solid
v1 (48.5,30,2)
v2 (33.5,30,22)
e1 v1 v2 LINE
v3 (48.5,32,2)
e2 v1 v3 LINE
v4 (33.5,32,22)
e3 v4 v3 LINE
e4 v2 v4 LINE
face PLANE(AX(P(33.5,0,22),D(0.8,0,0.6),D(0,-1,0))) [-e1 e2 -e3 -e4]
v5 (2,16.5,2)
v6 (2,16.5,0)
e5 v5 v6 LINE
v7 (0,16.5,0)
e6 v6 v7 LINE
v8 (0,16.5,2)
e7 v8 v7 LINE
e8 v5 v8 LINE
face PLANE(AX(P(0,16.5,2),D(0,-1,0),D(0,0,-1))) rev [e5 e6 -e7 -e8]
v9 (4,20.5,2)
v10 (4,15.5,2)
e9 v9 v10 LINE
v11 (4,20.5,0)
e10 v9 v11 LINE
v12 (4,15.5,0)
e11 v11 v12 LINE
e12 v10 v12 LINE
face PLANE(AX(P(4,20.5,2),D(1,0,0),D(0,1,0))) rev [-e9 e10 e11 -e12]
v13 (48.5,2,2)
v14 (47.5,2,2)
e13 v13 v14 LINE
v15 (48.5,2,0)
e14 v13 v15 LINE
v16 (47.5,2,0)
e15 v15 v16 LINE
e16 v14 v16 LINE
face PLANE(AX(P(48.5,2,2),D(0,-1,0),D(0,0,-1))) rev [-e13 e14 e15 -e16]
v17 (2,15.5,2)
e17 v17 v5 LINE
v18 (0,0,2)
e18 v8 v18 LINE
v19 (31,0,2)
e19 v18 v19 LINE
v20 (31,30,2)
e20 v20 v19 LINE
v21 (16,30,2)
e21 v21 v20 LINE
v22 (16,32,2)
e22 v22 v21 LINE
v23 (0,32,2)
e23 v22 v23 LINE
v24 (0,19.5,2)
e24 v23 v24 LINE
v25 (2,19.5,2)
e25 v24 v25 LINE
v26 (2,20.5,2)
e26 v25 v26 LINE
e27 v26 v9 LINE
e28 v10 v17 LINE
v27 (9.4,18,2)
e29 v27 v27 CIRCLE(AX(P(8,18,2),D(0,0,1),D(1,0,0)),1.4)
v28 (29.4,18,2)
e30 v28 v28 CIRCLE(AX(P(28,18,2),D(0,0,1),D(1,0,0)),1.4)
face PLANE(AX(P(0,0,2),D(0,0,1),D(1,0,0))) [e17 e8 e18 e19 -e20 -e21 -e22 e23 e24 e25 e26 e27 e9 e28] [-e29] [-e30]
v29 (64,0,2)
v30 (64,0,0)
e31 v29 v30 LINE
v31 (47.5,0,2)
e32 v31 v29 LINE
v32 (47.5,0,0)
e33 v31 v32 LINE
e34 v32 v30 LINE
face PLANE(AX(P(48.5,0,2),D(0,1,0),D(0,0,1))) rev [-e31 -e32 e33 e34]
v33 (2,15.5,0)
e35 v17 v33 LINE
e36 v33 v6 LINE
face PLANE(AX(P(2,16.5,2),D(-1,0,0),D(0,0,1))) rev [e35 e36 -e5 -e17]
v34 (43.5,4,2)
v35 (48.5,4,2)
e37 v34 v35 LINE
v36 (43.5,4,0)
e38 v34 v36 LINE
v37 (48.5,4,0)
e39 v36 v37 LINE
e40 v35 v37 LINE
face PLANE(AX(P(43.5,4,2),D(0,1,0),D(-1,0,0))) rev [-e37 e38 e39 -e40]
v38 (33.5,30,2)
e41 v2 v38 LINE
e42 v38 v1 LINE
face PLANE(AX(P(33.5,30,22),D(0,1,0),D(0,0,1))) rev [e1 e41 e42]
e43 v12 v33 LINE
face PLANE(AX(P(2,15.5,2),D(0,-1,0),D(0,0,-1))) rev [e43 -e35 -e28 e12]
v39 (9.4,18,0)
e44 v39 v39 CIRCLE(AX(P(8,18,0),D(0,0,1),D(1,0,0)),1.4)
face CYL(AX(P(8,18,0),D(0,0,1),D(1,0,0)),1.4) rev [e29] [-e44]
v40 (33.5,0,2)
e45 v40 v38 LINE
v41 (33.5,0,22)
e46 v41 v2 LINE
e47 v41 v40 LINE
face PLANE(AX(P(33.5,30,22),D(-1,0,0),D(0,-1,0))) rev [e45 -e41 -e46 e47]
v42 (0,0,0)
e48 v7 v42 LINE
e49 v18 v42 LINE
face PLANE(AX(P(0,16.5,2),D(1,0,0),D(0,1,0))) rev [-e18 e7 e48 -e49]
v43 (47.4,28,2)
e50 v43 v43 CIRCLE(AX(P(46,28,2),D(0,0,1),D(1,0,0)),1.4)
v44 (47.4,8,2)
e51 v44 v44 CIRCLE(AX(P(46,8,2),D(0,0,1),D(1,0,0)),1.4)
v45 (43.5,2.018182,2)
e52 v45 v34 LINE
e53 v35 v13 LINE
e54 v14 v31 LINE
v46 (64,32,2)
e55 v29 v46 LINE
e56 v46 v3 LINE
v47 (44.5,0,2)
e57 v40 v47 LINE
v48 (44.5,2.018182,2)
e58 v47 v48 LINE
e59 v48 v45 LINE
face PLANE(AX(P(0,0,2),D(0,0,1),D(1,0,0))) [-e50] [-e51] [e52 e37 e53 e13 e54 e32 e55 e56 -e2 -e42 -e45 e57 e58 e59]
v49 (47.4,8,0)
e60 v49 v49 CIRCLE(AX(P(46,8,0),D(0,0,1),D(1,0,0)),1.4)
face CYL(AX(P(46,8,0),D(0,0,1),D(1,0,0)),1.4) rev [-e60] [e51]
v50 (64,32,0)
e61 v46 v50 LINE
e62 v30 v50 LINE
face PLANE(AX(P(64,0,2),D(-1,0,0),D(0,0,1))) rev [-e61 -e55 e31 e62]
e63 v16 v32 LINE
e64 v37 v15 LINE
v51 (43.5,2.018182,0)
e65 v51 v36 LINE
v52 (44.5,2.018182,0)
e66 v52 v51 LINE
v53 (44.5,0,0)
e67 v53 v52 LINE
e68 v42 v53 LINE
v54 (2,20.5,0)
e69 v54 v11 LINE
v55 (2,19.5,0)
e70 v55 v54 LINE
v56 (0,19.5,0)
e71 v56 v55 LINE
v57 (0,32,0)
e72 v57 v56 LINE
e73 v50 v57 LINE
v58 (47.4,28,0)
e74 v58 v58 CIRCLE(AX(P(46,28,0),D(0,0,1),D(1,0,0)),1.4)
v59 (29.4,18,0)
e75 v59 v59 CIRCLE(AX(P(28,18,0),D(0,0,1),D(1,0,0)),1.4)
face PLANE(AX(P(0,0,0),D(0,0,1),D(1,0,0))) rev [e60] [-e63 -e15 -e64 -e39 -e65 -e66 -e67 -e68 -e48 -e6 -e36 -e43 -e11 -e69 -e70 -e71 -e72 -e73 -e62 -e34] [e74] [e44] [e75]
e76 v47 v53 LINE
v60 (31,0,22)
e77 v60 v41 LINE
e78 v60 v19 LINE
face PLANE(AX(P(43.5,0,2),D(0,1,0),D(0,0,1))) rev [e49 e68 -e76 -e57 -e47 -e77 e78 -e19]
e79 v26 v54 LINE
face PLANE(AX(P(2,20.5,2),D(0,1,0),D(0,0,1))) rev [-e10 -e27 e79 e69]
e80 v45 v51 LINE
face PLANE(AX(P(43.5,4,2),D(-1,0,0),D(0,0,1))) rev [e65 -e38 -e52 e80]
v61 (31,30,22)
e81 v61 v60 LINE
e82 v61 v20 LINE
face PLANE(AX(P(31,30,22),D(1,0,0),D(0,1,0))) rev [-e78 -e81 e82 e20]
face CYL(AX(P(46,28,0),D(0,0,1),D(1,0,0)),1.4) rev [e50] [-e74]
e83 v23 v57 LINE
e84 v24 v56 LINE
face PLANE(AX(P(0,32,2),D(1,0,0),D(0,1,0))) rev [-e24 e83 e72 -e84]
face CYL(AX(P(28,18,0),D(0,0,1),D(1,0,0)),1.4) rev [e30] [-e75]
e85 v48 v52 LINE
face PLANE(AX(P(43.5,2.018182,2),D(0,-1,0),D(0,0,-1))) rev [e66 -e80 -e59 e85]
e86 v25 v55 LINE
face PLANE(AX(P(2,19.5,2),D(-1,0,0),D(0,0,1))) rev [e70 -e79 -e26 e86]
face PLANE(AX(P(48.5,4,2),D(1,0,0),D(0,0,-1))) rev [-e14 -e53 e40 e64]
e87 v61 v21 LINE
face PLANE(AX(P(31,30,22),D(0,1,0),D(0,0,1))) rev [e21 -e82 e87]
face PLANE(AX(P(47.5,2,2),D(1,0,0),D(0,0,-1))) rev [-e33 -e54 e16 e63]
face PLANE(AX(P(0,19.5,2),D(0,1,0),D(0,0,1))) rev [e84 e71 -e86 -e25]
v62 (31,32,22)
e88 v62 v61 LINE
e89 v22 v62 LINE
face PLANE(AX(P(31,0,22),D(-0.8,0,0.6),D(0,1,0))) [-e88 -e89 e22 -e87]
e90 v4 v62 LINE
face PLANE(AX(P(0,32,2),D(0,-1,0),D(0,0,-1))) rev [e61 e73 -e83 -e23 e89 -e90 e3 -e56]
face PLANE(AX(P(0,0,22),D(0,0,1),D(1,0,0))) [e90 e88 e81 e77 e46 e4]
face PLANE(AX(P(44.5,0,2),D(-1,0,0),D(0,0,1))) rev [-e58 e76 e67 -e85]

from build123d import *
from OCP.BRepFilletAPI import BRepFilletAPI_MakeChamfer

# Parameters (mm, degrees)
BOSS_EXTRU_1_DEPTH      = 2
BOSS_EXTRU_2_DEPTH      = 20
ESQUISSE2_R             = 1.4
ENL_V_MAT_EXTRU_1_DEPTH = 75.296702484
CHANFREIN1_SIZE         = 15
CHANFREIN1_SIZE_2       = 20


with BuildPart() as part:
    # Esquisse1 → Boss.-Extru.1 (new body)
    with BuildSketch(Plane.XY):
        Polygon((0, 0), (43.5, 0), (44.5, 0), (44.5, 2.018181818), (43.5, 2.018181818), (43.5, 4), (48.5, 4), (48.5, 2), (47.5, 2), (47.5, 0), (48.5, 0), (64, 0), (64, 32), (0, 32), (0, 19.5), (2, 19.5), (2, 20.5), (4, 20.5), (4, 15.5), (2, 15.5), (2, 16.5), (0, 16.5), (0, 13.5), align=None)
    extrude(amount=BOSS_EXTRU_1_DEPTH)

    # Esquisse3 → Boss.-Extru.2 (add)
    with BuildSketch(Plane.XY.offset(2)):
        Polygon((26.917717359, 32), (29.417717359, 32), (48.5, 32), (48.5, 30), (33.5, 30), (33.5, 0), (31, 0), (31, 30), (16, 30), (16, 32), align=None)
    extrude(amount=BOSS_EXTRU_2_DEPTH)

    # Esquisse2 → Enlèv. mat.-Extru.1 (cut, through all)
    with BuildSketch(Plane.XY.offset(2)):
        with Locations((8, 18)):
            Circle(ESQUISSE2_R)
        with Locations((28, 18)):
            Circle(ESQUISSE2_R)
        with Locations((46, 28)):
            Circle(ESQUISSE2_R)
        with Locations((46, 8)):
            Circle(ESQUISSE2_R)
    extrude(amount=-ENL_V_MAT_EXTRU_1_DEPTH, mode=Mode.SUBTRACT)

    # Chanfrein1
    chanfrein1_edges_1 = [part.edges().sort_by_distance(p)[0] for p in [
        (48.5, 31, 22),
    ]]
    chanfrein1_side_1 = [part.faces().sort_by_distance(p)[0] for p in [
        (48.2, 31, 22),
    ]]
    chanfrein1_edges_2 = [part.edges().sort_by_distance(p)[0] for p in [
        (16, 31, 22),
    ]]
    chanfrein1_side_2 = [part.faces().sort_by_distance(p)[0] for p in [
        (16.3, 31, 22),
    ]]
    chanfrein1 = BRepFilletAPI_MakeChamfer(part.part.solid().wrapped)
    for e in chanfrein1_edges_1:
        chanfrein1.Add(CHANFREIN1_SIZE - 0.0001, CHANFREIN1_SIZE_2 - 0.0001, e.wrapped, chanfrein1_side_1[0].wrapped)
    for e in chanfrein1_edges_2:
        chanfrein1.Add(CHANFREIN1_SIZE - 0.0001, CHANFREIN1_SIZE_2 - 0.0001, e.wrapped, chanfrein1_side_2[0].wrapped)
    add(Compound.cast(chanfrein1.Shape()), mode=Mode.REPLACE)  # a hair under: the kernel refuses the full size


solid = part.part
